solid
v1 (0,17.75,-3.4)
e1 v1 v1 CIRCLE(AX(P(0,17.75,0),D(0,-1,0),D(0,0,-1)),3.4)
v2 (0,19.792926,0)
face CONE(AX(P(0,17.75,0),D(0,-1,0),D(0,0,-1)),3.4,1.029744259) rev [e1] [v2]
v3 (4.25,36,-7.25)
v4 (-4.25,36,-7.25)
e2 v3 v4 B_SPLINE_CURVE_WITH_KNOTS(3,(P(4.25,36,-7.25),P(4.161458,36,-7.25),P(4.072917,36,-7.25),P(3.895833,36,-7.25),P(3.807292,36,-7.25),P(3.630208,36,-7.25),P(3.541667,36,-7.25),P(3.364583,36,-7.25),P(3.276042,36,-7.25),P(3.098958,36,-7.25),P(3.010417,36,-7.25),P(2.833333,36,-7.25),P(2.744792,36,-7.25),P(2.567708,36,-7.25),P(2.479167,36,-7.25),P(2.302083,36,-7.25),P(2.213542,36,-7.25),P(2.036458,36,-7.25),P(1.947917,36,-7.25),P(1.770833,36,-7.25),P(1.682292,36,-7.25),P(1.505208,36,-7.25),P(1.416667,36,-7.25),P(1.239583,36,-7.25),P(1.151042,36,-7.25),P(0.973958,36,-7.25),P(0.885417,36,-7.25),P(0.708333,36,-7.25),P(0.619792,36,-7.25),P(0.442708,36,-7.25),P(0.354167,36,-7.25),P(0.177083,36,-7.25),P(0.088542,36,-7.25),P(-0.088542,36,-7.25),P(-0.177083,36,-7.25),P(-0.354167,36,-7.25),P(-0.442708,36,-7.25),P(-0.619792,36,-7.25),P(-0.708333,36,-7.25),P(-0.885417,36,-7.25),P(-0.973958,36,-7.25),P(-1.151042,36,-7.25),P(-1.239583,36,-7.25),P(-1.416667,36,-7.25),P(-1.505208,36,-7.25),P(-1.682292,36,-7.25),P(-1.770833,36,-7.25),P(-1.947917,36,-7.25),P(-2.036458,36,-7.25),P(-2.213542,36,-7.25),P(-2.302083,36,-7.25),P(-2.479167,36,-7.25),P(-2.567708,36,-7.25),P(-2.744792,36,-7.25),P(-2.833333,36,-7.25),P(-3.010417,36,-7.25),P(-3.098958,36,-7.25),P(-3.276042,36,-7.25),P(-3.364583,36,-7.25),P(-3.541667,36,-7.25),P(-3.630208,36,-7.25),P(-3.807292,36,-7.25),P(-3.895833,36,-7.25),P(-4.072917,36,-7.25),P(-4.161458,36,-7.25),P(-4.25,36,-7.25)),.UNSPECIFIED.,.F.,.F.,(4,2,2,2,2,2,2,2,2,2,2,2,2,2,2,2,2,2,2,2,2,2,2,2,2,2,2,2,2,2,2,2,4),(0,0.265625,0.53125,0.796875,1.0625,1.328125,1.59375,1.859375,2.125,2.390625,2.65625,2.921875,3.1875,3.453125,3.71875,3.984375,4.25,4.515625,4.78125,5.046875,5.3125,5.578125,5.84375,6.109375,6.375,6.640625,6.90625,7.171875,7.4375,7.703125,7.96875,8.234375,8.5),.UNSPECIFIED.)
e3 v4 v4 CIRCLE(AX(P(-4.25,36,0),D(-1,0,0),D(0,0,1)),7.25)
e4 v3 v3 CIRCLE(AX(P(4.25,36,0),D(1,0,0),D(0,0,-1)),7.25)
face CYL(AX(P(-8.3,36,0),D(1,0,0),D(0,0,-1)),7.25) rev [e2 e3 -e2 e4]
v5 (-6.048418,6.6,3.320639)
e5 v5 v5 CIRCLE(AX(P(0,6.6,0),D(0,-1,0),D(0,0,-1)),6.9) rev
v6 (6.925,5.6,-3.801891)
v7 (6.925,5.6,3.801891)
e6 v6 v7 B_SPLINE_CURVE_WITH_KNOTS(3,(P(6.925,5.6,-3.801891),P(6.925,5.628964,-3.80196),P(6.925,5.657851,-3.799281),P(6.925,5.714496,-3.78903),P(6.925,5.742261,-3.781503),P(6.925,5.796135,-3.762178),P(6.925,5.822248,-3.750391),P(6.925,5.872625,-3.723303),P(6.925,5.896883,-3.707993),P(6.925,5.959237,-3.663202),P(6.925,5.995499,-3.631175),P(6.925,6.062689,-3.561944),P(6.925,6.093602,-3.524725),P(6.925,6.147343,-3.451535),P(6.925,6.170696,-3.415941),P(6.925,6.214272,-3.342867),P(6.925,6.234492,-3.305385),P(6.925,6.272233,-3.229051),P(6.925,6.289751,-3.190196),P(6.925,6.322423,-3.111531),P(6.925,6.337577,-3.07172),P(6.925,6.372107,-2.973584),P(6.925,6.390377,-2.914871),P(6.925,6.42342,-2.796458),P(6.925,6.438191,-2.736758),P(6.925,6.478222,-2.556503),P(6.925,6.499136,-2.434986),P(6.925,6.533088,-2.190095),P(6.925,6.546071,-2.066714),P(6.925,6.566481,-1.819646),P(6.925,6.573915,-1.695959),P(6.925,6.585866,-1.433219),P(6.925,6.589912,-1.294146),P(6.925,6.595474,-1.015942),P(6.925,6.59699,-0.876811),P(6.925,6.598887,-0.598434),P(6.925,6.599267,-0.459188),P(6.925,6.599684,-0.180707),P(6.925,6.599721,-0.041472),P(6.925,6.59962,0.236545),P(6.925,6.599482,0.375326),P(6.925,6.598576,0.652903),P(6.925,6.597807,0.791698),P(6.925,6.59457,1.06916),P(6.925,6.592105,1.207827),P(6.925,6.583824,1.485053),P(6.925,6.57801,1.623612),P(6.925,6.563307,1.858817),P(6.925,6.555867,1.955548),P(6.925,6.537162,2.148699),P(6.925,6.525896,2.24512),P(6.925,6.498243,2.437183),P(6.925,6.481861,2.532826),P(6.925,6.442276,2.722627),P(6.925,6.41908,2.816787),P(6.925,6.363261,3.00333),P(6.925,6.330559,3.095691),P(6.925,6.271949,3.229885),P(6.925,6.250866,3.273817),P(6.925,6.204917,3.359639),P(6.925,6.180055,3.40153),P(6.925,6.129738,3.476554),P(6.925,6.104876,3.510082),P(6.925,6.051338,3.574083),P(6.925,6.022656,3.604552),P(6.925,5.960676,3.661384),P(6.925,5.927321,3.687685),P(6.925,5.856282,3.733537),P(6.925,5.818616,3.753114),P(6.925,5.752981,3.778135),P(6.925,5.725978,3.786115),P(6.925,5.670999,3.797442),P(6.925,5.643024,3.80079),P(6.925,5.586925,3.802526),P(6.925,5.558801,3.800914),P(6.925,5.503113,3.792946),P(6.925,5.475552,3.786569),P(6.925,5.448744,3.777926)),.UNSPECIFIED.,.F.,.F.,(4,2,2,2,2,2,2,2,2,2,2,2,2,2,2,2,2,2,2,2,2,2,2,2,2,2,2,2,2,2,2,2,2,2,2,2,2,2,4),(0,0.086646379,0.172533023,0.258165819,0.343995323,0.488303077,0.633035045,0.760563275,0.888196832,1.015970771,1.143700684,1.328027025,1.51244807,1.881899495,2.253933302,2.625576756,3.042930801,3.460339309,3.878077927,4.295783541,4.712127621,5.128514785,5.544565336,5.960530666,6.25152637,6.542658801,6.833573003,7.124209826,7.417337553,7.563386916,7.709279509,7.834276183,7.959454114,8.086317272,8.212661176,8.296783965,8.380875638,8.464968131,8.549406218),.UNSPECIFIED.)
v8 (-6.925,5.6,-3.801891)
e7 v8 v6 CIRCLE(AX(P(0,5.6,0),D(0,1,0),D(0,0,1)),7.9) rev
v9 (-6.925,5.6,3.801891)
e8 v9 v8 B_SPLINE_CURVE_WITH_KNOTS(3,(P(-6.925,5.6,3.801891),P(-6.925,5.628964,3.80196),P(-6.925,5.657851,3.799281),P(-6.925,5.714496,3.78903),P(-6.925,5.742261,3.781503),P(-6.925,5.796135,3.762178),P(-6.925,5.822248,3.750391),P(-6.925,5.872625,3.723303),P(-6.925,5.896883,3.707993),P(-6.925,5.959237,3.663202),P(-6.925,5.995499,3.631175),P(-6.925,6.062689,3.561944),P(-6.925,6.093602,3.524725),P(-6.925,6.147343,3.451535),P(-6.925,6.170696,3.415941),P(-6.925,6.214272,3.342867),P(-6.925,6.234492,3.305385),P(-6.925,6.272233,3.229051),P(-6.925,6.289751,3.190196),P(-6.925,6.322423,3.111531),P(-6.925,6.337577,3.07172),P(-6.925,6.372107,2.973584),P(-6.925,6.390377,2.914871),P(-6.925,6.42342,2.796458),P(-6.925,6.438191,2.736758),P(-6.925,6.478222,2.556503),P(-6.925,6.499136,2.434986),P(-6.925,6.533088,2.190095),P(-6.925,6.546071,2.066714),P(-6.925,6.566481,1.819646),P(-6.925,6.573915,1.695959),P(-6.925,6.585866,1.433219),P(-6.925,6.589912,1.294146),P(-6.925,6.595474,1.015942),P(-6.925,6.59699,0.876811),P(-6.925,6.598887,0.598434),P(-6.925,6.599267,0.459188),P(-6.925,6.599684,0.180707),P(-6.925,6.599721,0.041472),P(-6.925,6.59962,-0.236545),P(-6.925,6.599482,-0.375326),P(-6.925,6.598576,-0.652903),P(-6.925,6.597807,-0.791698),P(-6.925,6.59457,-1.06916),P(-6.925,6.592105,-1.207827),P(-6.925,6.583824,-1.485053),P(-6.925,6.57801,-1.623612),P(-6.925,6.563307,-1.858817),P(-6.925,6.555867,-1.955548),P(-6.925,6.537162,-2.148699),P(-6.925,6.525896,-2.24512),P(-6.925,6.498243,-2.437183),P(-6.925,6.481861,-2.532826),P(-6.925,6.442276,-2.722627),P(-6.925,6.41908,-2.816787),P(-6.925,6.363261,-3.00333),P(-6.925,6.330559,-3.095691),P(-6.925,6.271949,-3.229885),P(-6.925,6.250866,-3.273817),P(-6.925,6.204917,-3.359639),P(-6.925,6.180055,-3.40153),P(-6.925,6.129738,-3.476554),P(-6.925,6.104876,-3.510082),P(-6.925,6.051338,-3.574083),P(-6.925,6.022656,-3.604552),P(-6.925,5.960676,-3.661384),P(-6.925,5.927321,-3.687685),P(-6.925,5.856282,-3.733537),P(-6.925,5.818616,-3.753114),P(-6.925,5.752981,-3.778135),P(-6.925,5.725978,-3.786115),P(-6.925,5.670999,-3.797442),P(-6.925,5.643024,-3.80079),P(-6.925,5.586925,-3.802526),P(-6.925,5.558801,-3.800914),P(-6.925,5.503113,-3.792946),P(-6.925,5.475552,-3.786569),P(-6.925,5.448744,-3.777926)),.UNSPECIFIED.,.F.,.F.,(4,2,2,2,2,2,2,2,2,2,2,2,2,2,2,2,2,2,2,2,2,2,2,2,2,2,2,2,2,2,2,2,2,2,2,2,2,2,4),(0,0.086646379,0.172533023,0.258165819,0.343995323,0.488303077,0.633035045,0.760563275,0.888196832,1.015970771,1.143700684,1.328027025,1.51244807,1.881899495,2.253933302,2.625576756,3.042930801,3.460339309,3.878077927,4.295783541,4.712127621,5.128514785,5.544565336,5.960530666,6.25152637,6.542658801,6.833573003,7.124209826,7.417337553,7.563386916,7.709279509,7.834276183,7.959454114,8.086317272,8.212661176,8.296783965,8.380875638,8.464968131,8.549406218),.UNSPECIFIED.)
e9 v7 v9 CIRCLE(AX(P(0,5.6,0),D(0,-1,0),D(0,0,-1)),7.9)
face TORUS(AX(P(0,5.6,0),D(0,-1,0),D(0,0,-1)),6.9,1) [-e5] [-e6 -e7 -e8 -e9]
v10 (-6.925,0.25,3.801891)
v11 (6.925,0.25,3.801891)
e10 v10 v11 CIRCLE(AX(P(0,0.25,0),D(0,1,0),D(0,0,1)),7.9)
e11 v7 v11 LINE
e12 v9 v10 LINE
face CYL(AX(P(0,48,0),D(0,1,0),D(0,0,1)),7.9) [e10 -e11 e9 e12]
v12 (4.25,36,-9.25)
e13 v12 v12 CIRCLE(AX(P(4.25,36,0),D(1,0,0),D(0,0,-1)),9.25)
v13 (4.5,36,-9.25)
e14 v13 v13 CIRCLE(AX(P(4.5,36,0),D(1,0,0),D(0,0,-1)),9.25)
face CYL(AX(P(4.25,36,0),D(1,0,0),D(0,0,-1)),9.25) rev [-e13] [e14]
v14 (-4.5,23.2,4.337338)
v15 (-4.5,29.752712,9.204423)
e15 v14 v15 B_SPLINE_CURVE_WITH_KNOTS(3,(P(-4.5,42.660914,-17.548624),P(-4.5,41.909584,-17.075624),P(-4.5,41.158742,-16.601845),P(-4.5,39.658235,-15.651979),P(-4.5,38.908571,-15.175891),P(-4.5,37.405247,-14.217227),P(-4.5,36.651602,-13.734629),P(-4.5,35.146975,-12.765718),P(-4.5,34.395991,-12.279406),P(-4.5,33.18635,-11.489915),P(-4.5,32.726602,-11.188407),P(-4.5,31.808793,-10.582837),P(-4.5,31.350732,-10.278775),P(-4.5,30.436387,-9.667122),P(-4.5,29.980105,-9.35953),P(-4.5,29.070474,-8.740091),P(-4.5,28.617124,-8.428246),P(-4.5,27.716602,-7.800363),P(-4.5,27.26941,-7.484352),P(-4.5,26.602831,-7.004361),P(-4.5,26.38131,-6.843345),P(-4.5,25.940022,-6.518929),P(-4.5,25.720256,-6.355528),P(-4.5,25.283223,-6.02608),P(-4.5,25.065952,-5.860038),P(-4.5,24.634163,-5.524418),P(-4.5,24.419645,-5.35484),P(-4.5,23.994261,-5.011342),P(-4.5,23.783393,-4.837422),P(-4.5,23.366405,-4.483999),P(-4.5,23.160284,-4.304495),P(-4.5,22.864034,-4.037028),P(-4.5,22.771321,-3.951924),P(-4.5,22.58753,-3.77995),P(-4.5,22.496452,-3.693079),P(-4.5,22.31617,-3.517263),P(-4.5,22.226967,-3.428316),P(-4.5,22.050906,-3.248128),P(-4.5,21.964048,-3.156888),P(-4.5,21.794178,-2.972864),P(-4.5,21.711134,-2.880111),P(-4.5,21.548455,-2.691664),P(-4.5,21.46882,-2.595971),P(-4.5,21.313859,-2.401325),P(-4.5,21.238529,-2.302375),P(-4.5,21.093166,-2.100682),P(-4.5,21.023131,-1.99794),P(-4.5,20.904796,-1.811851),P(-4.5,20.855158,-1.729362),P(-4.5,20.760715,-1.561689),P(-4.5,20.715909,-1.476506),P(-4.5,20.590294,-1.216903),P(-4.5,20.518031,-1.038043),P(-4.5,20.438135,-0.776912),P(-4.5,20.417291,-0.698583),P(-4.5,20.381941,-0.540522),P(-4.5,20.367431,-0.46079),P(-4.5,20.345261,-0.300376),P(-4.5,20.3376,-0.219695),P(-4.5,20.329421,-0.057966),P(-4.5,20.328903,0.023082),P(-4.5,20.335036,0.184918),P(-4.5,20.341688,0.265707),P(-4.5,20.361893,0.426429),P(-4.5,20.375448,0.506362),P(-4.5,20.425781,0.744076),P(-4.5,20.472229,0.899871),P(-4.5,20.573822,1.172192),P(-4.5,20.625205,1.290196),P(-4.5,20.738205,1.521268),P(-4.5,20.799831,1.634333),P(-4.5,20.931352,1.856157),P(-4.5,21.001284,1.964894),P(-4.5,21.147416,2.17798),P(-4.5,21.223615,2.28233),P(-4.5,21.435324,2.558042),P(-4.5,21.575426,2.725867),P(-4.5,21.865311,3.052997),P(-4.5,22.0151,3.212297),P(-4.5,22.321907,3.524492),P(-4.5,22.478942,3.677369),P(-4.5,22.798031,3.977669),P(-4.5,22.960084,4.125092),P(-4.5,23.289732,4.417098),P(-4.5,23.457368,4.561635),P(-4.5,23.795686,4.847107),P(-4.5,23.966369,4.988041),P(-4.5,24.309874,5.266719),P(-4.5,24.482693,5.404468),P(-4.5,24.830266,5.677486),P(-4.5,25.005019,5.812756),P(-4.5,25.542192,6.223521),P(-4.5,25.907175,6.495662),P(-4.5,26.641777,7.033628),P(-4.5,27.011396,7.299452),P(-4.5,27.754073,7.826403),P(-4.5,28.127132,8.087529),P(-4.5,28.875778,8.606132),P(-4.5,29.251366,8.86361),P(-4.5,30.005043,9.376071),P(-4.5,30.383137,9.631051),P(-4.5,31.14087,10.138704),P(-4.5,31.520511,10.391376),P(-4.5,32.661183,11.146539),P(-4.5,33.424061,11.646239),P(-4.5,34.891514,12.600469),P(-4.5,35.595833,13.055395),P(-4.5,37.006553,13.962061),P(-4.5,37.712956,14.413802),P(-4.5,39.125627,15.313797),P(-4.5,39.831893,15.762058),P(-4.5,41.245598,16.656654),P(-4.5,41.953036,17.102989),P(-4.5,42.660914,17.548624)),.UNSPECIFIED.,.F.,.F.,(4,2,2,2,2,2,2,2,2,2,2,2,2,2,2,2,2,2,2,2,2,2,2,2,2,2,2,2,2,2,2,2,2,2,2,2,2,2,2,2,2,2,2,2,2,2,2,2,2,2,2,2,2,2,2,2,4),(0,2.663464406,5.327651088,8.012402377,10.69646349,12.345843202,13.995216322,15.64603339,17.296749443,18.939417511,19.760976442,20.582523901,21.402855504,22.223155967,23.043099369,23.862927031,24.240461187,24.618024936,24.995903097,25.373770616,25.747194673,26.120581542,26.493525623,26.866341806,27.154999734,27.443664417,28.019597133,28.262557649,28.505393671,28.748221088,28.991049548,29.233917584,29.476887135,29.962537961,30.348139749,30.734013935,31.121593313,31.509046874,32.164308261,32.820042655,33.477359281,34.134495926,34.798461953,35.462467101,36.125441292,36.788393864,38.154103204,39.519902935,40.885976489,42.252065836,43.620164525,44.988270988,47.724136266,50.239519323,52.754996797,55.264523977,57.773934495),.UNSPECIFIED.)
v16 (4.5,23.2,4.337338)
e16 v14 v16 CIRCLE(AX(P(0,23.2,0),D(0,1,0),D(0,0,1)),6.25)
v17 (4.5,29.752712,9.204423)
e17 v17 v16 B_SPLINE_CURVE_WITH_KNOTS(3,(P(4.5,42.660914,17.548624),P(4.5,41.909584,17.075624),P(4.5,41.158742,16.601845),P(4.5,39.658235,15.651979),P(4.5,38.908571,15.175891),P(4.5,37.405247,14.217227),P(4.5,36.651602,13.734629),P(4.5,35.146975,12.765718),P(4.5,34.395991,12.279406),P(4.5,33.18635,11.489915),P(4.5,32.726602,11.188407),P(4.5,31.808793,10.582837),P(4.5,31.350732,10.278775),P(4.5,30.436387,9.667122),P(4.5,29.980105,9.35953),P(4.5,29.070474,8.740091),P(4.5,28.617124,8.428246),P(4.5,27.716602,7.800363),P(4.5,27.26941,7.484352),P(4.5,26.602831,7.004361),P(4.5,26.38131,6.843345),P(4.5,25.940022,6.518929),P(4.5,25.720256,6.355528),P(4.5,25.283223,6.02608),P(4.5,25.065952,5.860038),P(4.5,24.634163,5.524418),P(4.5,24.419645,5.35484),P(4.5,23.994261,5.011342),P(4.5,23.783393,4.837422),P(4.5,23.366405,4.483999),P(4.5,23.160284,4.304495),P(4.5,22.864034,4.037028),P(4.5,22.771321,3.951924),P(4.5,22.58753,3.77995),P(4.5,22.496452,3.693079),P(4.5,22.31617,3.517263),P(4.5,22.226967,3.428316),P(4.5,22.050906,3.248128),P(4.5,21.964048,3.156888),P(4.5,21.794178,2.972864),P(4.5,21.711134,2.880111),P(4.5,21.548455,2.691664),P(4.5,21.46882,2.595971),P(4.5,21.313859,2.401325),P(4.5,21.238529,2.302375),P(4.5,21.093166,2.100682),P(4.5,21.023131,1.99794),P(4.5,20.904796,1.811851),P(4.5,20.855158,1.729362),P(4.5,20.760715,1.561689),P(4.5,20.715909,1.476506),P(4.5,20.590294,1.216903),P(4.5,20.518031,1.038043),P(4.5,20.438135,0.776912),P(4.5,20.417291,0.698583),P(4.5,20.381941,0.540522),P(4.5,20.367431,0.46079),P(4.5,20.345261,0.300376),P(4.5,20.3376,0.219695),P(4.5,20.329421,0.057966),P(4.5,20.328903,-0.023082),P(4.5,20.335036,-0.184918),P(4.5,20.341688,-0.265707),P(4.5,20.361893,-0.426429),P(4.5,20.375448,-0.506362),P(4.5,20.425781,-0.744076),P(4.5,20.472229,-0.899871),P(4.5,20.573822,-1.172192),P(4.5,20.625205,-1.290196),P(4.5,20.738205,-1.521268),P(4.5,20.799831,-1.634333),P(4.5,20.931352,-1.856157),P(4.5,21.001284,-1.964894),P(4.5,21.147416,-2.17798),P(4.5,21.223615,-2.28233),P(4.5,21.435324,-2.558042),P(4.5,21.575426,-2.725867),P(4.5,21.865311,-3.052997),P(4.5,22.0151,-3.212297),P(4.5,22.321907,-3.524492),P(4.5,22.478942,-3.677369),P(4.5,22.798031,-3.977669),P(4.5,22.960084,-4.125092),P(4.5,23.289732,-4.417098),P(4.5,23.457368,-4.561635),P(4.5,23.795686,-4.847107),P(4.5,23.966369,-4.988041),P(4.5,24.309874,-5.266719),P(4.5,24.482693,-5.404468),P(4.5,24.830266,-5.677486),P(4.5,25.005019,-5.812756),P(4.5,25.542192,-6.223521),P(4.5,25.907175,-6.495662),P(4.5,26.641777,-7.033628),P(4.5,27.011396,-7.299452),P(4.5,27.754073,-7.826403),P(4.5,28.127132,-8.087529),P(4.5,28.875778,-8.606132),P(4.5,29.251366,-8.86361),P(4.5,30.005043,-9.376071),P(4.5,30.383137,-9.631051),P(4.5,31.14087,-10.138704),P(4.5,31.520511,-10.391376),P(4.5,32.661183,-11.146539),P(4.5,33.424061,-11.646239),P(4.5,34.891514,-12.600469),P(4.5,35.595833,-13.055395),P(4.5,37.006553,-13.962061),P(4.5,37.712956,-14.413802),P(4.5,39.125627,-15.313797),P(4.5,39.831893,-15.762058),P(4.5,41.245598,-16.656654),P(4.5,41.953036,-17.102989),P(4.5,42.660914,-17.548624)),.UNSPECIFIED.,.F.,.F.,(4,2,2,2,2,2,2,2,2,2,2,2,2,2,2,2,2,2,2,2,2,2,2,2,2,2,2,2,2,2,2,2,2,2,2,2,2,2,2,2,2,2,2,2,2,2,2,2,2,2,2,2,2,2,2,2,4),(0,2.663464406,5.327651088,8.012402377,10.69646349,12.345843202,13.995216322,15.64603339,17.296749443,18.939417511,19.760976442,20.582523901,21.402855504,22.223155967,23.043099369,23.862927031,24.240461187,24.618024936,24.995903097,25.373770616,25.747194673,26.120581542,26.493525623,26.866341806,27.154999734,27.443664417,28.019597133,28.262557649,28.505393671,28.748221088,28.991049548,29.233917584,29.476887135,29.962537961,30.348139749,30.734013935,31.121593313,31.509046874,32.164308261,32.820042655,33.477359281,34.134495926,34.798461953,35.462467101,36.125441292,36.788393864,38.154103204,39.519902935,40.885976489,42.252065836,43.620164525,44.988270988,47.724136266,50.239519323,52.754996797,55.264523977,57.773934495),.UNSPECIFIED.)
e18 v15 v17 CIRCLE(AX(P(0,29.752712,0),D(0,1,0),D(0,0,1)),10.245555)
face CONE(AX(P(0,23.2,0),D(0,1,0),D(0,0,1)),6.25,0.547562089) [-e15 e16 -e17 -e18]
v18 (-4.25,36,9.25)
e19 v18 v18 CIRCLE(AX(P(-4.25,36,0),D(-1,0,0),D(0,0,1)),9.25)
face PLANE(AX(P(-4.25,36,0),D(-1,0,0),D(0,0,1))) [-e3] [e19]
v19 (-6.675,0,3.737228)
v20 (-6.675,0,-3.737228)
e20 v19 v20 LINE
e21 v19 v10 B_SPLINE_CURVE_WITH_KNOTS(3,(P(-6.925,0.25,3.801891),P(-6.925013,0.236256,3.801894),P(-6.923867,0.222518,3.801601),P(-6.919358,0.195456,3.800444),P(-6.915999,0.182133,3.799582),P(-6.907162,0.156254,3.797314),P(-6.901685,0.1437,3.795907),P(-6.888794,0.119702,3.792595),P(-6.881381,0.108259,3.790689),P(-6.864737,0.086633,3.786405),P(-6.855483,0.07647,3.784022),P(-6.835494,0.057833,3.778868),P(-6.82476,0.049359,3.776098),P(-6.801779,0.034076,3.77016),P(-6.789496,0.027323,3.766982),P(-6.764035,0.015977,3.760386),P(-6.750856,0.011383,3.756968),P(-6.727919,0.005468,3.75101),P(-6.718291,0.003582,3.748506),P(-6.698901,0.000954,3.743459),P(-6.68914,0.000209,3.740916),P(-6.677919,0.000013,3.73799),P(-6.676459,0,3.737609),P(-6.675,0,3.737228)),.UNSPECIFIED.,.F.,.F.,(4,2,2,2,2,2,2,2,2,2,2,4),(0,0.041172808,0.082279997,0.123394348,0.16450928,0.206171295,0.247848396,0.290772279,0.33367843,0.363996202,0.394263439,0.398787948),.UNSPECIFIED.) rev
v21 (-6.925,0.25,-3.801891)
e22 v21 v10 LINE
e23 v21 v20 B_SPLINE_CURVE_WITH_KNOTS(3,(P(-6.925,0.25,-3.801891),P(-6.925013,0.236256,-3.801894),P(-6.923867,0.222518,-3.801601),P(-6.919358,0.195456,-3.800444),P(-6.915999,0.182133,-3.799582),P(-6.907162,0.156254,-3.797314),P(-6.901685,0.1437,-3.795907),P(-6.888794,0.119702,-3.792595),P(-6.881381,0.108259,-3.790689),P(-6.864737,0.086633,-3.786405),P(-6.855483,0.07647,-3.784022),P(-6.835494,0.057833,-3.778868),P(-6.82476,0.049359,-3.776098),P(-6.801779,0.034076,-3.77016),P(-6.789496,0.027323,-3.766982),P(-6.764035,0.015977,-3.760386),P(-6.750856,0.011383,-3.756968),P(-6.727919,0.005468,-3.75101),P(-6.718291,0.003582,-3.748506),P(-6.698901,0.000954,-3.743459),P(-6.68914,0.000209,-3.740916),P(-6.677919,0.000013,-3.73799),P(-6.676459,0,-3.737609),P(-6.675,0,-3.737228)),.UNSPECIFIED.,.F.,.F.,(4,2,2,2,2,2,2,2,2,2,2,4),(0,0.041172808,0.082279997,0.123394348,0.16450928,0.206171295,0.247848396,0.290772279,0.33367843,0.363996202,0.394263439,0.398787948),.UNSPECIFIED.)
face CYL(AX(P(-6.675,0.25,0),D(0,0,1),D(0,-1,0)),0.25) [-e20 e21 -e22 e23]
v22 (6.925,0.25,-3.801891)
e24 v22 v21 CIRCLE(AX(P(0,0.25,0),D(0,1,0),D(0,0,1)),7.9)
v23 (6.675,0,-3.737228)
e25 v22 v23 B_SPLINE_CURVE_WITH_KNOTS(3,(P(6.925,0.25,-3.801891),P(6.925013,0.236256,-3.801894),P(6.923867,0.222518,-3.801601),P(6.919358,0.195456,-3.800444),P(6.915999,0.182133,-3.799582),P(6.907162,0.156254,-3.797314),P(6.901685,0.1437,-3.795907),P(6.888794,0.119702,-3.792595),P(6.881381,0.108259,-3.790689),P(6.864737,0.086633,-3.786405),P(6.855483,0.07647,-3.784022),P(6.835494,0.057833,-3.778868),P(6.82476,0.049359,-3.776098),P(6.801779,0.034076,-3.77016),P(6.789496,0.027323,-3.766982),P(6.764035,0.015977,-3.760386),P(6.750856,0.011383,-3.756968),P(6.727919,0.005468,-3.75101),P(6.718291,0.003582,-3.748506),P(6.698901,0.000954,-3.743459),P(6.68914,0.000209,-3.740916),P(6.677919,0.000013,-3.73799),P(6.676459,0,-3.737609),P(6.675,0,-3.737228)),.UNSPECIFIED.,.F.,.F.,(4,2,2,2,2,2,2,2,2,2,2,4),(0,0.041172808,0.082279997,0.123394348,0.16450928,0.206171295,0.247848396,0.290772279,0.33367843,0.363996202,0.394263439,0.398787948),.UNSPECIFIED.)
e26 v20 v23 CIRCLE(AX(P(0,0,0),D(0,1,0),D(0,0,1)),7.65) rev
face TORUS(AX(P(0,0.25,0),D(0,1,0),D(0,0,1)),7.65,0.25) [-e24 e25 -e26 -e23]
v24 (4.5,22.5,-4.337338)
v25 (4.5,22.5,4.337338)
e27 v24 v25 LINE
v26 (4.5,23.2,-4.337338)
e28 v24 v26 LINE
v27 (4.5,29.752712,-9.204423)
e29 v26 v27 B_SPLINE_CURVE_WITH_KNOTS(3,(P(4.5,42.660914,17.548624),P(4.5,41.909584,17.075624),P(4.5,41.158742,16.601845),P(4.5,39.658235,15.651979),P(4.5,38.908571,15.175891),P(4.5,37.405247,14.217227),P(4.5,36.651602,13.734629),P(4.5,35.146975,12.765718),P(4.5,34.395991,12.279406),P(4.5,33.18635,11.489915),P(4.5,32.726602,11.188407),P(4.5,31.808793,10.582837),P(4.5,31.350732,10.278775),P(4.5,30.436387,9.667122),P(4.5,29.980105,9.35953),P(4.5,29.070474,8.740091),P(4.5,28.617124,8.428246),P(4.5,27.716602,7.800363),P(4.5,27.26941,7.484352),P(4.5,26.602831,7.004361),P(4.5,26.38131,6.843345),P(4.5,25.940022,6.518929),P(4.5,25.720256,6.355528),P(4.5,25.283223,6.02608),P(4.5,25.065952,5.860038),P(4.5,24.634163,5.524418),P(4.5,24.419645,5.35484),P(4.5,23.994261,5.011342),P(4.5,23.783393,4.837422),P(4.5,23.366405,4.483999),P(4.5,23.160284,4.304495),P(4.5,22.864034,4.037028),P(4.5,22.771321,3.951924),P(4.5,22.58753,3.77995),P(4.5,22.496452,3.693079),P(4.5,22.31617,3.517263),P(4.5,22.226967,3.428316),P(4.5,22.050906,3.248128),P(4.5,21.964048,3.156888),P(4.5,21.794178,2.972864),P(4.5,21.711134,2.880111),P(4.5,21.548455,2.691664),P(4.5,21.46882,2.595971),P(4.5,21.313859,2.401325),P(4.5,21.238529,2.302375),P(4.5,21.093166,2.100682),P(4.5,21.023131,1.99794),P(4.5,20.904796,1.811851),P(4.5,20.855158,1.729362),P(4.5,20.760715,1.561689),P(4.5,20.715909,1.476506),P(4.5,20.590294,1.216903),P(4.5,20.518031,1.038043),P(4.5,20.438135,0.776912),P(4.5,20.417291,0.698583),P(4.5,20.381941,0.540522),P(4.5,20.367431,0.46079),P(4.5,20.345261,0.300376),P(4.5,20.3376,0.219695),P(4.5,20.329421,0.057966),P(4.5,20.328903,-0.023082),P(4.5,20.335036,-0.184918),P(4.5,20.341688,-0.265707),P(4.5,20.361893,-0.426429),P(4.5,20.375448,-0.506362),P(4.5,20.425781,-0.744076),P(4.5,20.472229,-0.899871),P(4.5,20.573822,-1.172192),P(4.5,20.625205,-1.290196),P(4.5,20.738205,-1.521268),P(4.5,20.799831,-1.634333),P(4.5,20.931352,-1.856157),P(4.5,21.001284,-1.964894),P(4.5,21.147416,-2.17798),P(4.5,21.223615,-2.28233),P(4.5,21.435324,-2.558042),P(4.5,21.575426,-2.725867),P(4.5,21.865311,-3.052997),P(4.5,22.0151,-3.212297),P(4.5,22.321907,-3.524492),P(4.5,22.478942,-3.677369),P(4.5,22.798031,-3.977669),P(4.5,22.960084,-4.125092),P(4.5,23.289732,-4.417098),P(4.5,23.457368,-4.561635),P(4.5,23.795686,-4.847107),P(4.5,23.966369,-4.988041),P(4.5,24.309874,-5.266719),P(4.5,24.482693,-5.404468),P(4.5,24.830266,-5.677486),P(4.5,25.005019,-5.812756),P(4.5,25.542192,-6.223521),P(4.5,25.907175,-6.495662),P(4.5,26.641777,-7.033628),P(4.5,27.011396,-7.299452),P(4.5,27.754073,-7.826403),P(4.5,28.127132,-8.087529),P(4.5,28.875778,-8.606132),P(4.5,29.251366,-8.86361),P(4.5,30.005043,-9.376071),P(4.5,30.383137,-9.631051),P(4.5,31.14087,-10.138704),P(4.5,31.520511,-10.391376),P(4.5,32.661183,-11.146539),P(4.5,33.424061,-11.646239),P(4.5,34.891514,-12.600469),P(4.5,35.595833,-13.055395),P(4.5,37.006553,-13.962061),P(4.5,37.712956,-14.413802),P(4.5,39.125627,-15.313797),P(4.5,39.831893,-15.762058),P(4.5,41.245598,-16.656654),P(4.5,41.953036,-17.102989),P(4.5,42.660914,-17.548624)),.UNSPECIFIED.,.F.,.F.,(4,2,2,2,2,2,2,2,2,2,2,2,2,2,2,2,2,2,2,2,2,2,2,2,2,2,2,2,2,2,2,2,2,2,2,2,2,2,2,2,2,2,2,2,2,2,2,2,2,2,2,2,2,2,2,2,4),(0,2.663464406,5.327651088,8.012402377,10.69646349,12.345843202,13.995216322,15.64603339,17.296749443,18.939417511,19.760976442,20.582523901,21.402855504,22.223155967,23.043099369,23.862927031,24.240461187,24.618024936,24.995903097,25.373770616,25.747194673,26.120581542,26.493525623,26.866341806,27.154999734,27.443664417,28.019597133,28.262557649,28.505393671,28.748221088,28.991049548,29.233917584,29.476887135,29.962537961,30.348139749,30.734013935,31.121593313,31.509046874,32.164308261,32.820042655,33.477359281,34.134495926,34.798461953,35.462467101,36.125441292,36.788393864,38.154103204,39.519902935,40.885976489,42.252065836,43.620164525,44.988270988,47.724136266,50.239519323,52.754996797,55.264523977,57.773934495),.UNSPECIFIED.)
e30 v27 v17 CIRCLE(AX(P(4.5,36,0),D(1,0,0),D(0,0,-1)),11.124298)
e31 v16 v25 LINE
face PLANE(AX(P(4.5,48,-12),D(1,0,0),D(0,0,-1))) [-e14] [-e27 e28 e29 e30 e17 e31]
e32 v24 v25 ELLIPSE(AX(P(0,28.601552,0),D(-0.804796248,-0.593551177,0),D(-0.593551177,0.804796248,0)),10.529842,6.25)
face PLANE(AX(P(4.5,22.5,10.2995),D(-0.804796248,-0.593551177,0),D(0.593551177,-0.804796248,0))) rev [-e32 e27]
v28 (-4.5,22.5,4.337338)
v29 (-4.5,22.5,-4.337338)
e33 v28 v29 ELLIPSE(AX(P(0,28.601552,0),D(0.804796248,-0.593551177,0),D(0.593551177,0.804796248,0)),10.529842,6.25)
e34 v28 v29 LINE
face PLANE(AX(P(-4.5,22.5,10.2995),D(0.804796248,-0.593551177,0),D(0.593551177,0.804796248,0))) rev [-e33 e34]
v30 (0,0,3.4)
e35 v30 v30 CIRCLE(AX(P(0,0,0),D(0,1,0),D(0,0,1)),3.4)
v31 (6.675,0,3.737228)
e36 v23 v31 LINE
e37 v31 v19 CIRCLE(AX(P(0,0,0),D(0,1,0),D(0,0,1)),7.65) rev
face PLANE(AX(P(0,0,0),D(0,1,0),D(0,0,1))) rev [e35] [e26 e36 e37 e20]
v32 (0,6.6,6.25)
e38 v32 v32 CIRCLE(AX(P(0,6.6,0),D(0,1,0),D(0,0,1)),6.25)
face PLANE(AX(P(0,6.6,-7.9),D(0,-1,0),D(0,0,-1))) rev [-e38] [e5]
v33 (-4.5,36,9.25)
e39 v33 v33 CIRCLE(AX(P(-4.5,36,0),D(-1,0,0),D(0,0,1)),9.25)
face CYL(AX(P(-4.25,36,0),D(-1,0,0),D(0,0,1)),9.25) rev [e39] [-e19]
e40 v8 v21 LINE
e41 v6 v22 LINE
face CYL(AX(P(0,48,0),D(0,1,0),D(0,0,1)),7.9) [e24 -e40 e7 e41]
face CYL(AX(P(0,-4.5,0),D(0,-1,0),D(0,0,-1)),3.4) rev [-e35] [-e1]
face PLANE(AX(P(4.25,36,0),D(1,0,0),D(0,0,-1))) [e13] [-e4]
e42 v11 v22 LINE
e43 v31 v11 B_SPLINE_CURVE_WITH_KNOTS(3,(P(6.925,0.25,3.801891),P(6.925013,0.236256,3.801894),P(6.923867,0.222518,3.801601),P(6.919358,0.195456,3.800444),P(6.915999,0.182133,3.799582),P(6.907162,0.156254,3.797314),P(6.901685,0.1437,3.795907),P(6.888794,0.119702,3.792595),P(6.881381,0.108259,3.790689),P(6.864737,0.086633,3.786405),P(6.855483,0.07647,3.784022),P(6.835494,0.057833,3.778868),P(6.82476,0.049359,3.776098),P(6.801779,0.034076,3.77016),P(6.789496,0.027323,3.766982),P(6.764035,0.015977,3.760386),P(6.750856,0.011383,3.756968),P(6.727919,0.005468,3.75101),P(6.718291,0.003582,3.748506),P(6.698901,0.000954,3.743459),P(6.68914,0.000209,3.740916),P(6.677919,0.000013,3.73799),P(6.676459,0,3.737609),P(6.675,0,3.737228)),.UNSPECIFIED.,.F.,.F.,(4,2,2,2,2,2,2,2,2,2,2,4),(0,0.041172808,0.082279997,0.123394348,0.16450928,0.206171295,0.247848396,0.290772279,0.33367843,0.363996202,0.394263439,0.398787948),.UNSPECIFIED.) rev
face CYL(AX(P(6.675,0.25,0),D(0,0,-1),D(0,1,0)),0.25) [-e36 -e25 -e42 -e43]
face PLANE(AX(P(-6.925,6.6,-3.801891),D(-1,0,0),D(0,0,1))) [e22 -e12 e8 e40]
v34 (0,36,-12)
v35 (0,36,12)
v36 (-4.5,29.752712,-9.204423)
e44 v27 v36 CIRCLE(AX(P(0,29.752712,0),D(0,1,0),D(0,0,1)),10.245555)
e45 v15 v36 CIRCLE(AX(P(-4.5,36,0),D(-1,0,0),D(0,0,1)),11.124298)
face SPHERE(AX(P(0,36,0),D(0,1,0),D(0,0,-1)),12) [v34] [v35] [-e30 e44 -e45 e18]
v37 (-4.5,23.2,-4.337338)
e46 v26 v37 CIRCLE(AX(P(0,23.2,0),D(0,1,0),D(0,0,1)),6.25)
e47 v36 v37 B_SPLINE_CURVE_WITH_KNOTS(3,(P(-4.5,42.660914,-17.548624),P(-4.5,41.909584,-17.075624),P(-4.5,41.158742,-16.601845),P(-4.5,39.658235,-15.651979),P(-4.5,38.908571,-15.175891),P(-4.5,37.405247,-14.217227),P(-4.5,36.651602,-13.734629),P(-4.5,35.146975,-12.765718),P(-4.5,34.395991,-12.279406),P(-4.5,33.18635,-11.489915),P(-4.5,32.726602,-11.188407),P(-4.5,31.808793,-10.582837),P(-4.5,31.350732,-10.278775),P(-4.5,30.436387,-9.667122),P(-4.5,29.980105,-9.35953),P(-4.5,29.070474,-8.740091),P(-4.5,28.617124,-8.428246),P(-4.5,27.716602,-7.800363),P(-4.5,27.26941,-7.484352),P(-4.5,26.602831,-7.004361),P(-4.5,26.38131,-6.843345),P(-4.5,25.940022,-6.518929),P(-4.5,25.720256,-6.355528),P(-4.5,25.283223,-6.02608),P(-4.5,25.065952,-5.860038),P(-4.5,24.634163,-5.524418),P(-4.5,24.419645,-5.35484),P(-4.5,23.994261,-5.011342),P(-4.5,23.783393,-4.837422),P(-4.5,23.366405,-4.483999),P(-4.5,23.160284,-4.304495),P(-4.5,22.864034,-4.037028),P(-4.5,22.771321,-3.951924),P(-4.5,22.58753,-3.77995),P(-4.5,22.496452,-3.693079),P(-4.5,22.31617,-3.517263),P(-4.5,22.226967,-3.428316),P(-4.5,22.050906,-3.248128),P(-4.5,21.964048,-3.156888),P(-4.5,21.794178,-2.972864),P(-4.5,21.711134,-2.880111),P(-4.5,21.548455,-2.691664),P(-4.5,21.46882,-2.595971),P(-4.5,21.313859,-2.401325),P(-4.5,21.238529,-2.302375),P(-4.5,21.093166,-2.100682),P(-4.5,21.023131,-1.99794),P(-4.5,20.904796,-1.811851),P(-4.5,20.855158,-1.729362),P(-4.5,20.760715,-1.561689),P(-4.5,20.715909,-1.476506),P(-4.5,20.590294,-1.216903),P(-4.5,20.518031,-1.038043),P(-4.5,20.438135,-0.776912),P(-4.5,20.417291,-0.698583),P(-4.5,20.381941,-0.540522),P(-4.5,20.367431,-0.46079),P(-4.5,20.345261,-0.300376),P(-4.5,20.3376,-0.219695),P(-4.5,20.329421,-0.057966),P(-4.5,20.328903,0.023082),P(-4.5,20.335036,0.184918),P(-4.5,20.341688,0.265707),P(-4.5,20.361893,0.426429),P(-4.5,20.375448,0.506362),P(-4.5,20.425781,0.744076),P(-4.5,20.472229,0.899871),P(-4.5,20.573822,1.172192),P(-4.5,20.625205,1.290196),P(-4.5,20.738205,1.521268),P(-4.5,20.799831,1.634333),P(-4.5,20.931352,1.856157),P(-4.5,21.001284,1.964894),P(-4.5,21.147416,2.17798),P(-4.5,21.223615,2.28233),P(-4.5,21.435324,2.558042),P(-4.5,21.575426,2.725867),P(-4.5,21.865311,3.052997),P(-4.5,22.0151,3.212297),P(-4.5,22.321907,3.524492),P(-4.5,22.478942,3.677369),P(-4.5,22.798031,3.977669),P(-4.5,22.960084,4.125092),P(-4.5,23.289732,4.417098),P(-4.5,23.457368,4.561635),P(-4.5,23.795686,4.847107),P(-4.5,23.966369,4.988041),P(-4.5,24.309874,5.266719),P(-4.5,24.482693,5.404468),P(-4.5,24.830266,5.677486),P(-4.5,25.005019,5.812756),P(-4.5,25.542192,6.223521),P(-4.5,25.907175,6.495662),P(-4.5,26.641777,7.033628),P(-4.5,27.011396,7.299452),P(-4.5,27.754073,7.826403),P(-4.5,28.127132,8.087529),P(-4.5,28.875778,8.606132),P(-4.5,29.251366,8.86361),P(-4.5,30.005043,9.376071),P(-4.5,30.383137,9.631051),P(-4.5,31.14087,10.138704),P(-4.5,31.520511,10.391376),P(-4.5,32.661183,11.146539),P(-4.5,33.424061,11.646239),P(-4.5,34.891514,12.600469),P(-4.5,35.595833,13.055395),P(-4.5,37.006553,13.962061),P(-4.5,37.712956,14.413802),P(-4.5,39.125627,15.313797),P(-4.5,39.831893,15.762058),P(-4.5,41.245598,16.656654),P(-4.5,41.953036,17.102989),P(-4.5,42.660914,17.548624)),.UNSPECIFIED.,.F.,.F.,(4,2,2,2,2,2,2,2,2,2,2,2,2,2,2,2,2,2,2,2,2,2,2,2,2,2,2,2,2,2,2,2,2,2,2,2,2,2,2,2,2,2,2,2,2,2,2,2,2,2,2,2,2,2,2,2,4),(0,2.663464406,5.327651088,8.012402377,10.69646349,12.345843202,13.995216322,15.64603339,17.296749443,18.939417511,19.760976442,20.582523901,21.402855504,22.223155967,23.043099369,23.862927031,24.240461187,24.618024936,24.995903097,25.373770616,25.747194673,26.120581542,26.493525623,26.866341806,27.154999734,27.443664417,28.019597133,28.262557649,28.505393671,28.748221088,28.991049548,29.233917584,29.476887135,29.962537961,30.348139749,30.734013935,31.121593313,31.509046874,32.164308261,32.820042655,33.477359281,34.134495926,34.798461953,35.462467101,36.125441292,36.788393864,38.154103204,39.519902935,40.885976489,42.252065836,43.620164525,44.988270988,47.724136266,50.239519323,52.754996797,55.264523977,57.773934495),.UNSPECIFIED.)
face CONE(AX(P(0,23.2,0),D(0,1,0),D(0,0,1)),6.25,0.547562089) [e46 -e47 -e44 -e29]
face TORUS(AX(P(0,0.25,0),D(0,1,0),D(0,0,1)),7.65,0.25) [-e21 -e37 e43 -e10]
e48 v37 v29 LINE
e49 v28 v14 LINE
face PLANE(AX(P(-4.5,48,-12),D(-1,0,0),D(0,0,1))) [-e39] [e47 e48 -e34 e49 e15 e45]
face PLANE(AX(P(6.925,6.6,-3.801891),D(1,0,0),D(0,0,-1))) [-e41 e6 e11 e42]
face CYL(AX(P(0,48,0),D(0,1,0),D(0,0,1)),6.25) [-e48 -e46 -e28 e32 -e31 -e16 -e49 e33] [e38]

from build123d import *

# Parameters (mm, degrees)
SKETCH2_OUTSIDE_W        = 37.758
SKETCH2_OUTSIDE_H        = 37.758
CUT_EXTRUDE1_DEPTH       = 6.6
SKETCH3_OUTSIDE_W        = 37.758
SKETCH3_OUTSIDE_H        = 37.758
SKETCH3_OUTSIDE_W_2      = 9
SKETCH3_OUTSIDE_H_2      = 24
CUT_EXTRUDE2_DEPTH       = 31.630866785
SKETCH4_R                = 9.25
SKETCH4_R_2              = 7.25
CUT_EXTRUDE3_DEPTH       = 0.25
CUT_EXTRUDE4_START       = -0.25
SKETCH5_R                = 9.25
SKETCH5_R_2              = 7.25
CUT_EXTRUDE4_DEPTH       = 0.25
DOME2_FACE_RADIUS        = 7.25
DOME2_HEIGHT             = 3.8
FILLET1_R                = 1
FILLET2_R                = 0.25
CUT_EXTRUDE10_DEPTH      = 10.2995
M8_TAPPED_HOLE1_D        = 6.8
M8_TAPPED_HOLE1_DEPTH    = 22.25
M8_TAPPED_HOLE1_TIP      = 2.042926105
CUT_EXTRUDE11_DEPTH      = 51.168615687
CUT_EXTRUDE11_DEPTH_BACK = 51.168615687
SKETCH6_R                = 7.25


# Read off the part's stored shape, not the designer's step: Dome1
with BuildPart() as part:
    # Sketch1 → Revolve1 (revolve)
    with BuildSketch(Plane(origin=(0, 0, 0), x_dir=(0, 0, -1), z_dir=(1, 0, 0)), mode=Mode.PRIVATE) as revolve1_sk:
        with BuildLine():
            Line((0, 0), (7.9, 0))
            Line((7.9, 0), (7.9, 6.6))
            Line((7.9, 6.6), (6.25, 6.6))
            Line((6.25, 6.6), (6.25, 23.2))
            Line((6.25, 23.2), (10.245555029, 29.752712416))
            ThreePointArc((10.245555029, 29.752712416), (10.463447114, 41.875055276), (0, 48))
            Line((0, 48), (0, 0))
        make_face()
    revolve(revolve1_sk.sketch.rotate(Axis((0, 48, 0), (0, -1, 0)), 180), axis=Axis((0, 48, 0), (0, -1, 0)))

    # Sketch2 outside → Cut-Extrude1 (cut)
    with BuildSketch(Plane(origin=(0, 0, 0), x_dir=(-1, 0, 0), z_dir=(0, -1, 0))):
        Rectangle(SKETCH2_OUTSIDE_W, SKETCH2_OUTSIDE_H)
        with BuildLine():
            Line((-6.925, 3.801890977), (-6.925, -3.801890977))
            ThreePointArc((-6.925, -3.801890977), (0, -7.9), (6.925, -3.801890977))
            Line((6.925, -3.801890977), (6.925, 3.801890977))
            ThreePointArc((6.925, 3.801890977), (0, 7.9), (-6.925, 3.801890977))
        make_face(mode=Mode.SUBTRACT)
    extrude(amount=-CUT_EXTRUDE1_DEPTH, mode=Mode.SUBTRACT)

    # Sketch3 outside → Cut-Extrude2 (cut, through all)
    with BuildSketch(Plane(origin=(0, 22.5, 0), x_dir=(-1, 0, 0), z_dir=(0, -1, 0))):
        Rectangle(SKETCH3_OUTSIDE_W, SKETCH3_OUTSIDE_H)
        Rectangle(SKETCH3_OUTSIDE_W_2, SKETCH3_OUTSIDE_H_2, mode=Mode.SUBTRACT)
    extrude(amount=-CUT_EXTRUDE2_DEPTH, mode=Mode.SUBTRACT)

    # Sketch4 → Cut-Extrude3 (cut)
    with BuildSketch(Plane(origin=(4.5, 0, 0), x_dir=(0, 0, -1), z_dir=(1, 0, 0))):
        with Locations((0, 36)):
            Circle(SKETCH4_R)
        with Locations((0, 36)):
            Circle(SKETCH4_R_2, mode=Mode.SUBTRACT)
    extrude(amount=-CUT_EXTRUDE3_DEPTH, mode=Mode.SUBTRACT)

    # Sketch5 → Cut-Extrude4 (cut)
    with BuildSketch(Plane.ZY.offset(4.5).offset(CUT_EXTRUDE4_START)):
        with Locations(Location((0, 36, 0), (0, 0, 180))):
            Circle(SKETCH5_R)
        with Locations(Location((0, 36, 0), (0, 0, 180))):
            Circle(SKETCH5_R_2, mode=Mode.SUBTRACT)
    extrude(amount=CUT_EXTRUDE4_DEPTH, mode=Mode.SUBTRACT)

    # Dome1 outline → Dome1 (revolve)
    with BuildSketch(Plane(origin=(0, 36, 0), x_dir=(0, 1, 0), z_dir=(0, 0, -1))):
        with BuildLine():
            Line((0, -4.499999993), (0, -8.3))
            ThreePointArc((0, -8.3), (4.092752745, -7.292422991), (7.250000005, -4.499999993))
            Line((7.250000005, -4.499999993), (0, -4.499999993))
        make_face()
    revolve(axis=Axis((0, 36, 0), (1, 0, 0)))

    # Dome2: a dome of height H over a round flat face of radius A is a cap of a sphere of radius (A * A + H * H) / (2 * H)
    dome2_r = (DOME2_FACE_RADIUS * DOME2_FACE_RADIUS + DOME2_HEIGHT * DOME2_HEIGHT) / (2 * DOME2_HEIGHT)
    dome2_base = Plane((4.5, 36, 0), z_dir=(1, 0, 0))
    with Locations(dome2_base.offset(DOME2_HEIGHT - dome2_r)):
        dome2_ball = Sphere(dome2_r, mode=Mode.PRIVATE)
    add(split(dome2_ball, bisect_by=dome2_base, keep=Keep.TOP, mode=Mode.PRIVATE))

    # Fillet1
    # the kernel refuses this fillet: 1 mm, written as the material it takes off along each edge
    with BuildSketch(Plane(origin=(0, 6.6, 0), x_dir=(-0.9669082627273712, 0, 0.25512430591681584), z_dir=(0.25512430591681584, 0, 0.9669082627273712))) as fillet1_piece_1:
        with BuildLine():
            CenterArc((7.9 - FILLET1_R, FILLET1_R), FILLET1_R, 270, 90)
            Line((7.9, FILLET1_R), (7.9 + FILLET1_R * 0.02, FILLET1_R))
            Line((7.9 + FILLET1_R * 0.02, FILLET1_R), (7.9 + FILLET1_R * 0.02, -FILLET1_R * 0.02))
            Line((7.9 + FILLET1_R * 0.02, -FILLET1_R * 0.02), (7.9 - FILLET1_R, -FILLET1_R * 0.02))
            Line((7.9 - FILLET1_R, -FILLET1_R * 0.02), (7.9 - FILLET1_R, 0))
        make_face()
    revolve(axis=Axis((0, 6.6, 0), (0, -1, 0)), revolution_arc=209.561901965, mode=Mode.SUBTRACT)
    with BuildSketch(Plane(origin=(0, 6.6, 0), x_dir=(-0.9669082627273712, 0, -0.2551243059168157), z_dir=(0.2551243059168157, 0, -0.9669082627273712))) as fillet1_piece_2:
        with BuildLine():
            CenterArc((7.9 - FILLET1_R, -FILLET1_R), FILLET1_R, 360, 90)
            Line((7.9, -FILLET1_R), (7.9 + FILLET1_R * 0.02, -FILLET1_R))
            Line((7.9 + FILLET1_R * 0.02, -FILLET1_R), (7.9 + FILLET1_R * 0.02, FILLET1_R * 0.02))
            Line((7.9 + FILLET1_R * 0.02, FILLET1_R * 0.02), (7.9 - FILLET1_R, FILLET1_R * 0.02))
            Line((7.9 - FILLET1_R, FILLET1_R * 0.02), (7.9 - FILLET1_R, 0))
        make_face()
    revolve(axis=Axis((0, 6.6, 0), (0, 1, 0)), revolution_arc=209.561901965, mode=Mode.SUBTRACT)

    # Fillet2
    fillet2_edges = [part.edges().sort_by_distance(p)[0] for p in [
        (0, 0, -7.9),
        (0, 0, 7.9),
        (6.925, 0, 0),
        (-6.925, 0, 0),
    ]]
    fillet(fillet2_edges, radius=FILLET2_R)

    # Sketch11 → Cut-Extrude10 (cut, symmetric)
    with BuildSketch(Plane(origin=(0, 0, 0), x_dir=(-1, 0, 0), z_dir=(0, 0, -1))):
        Polygon((-6.25, 22.5), (-4.5, 22.5), (-6.25, 20.127174391), align=None)
        Polygon((4.5, 22.5), (6.25, 22.5), (6.25, 20.127174391), align=None)
    extrude(amount=CUT_EXTRUDE10_DEPTH, both=True, mode=Mode.SUBTRACT)

    # M8 Tapped Hole1
    with Locations(Plane(origin=(0, -4.5, 0), x_dir=(-1, 0, 0), z_dir=(0, -1, 0))):
        with Locations((0, 0)):
            Hole(M8_TAPPED_HOLE1_D / 2, depth=M8_TAPPED_HOLE1_DEPTH)
            with Locations((0, 0, -(M8_TAPPED_HOLE1_DEPTH + M8_TAPPED_HOLE1_TIP / 2))):  # 118° drill point
                Cone(0, M8_TAPPED_HOLE1_D / 2, M8_TAPPED_HOLE1_TIP, mode=Mode.SUBTRACT)

    # Sketch6 → Cut-Extrude11 (cut, two sides: drawn at the far end of the back side and taken through both)
    with BuildSketch(Plane(origin=(0, 0, 0), x_dir=(0, 0, -1), z_dir=(1, 0, 0)).offset(-CUT_EXTRUDE11_DEPTH_BACK)):
        with Locations((0, 36)):
            Circle(SKETCH6_R)
    extrude(amount=CUT_EXTRUDE11_DEPTH + CUT_EXTRUDE11_DEPTH_BACK, mode=Mode.SUBTRACT)


solid = part.part
